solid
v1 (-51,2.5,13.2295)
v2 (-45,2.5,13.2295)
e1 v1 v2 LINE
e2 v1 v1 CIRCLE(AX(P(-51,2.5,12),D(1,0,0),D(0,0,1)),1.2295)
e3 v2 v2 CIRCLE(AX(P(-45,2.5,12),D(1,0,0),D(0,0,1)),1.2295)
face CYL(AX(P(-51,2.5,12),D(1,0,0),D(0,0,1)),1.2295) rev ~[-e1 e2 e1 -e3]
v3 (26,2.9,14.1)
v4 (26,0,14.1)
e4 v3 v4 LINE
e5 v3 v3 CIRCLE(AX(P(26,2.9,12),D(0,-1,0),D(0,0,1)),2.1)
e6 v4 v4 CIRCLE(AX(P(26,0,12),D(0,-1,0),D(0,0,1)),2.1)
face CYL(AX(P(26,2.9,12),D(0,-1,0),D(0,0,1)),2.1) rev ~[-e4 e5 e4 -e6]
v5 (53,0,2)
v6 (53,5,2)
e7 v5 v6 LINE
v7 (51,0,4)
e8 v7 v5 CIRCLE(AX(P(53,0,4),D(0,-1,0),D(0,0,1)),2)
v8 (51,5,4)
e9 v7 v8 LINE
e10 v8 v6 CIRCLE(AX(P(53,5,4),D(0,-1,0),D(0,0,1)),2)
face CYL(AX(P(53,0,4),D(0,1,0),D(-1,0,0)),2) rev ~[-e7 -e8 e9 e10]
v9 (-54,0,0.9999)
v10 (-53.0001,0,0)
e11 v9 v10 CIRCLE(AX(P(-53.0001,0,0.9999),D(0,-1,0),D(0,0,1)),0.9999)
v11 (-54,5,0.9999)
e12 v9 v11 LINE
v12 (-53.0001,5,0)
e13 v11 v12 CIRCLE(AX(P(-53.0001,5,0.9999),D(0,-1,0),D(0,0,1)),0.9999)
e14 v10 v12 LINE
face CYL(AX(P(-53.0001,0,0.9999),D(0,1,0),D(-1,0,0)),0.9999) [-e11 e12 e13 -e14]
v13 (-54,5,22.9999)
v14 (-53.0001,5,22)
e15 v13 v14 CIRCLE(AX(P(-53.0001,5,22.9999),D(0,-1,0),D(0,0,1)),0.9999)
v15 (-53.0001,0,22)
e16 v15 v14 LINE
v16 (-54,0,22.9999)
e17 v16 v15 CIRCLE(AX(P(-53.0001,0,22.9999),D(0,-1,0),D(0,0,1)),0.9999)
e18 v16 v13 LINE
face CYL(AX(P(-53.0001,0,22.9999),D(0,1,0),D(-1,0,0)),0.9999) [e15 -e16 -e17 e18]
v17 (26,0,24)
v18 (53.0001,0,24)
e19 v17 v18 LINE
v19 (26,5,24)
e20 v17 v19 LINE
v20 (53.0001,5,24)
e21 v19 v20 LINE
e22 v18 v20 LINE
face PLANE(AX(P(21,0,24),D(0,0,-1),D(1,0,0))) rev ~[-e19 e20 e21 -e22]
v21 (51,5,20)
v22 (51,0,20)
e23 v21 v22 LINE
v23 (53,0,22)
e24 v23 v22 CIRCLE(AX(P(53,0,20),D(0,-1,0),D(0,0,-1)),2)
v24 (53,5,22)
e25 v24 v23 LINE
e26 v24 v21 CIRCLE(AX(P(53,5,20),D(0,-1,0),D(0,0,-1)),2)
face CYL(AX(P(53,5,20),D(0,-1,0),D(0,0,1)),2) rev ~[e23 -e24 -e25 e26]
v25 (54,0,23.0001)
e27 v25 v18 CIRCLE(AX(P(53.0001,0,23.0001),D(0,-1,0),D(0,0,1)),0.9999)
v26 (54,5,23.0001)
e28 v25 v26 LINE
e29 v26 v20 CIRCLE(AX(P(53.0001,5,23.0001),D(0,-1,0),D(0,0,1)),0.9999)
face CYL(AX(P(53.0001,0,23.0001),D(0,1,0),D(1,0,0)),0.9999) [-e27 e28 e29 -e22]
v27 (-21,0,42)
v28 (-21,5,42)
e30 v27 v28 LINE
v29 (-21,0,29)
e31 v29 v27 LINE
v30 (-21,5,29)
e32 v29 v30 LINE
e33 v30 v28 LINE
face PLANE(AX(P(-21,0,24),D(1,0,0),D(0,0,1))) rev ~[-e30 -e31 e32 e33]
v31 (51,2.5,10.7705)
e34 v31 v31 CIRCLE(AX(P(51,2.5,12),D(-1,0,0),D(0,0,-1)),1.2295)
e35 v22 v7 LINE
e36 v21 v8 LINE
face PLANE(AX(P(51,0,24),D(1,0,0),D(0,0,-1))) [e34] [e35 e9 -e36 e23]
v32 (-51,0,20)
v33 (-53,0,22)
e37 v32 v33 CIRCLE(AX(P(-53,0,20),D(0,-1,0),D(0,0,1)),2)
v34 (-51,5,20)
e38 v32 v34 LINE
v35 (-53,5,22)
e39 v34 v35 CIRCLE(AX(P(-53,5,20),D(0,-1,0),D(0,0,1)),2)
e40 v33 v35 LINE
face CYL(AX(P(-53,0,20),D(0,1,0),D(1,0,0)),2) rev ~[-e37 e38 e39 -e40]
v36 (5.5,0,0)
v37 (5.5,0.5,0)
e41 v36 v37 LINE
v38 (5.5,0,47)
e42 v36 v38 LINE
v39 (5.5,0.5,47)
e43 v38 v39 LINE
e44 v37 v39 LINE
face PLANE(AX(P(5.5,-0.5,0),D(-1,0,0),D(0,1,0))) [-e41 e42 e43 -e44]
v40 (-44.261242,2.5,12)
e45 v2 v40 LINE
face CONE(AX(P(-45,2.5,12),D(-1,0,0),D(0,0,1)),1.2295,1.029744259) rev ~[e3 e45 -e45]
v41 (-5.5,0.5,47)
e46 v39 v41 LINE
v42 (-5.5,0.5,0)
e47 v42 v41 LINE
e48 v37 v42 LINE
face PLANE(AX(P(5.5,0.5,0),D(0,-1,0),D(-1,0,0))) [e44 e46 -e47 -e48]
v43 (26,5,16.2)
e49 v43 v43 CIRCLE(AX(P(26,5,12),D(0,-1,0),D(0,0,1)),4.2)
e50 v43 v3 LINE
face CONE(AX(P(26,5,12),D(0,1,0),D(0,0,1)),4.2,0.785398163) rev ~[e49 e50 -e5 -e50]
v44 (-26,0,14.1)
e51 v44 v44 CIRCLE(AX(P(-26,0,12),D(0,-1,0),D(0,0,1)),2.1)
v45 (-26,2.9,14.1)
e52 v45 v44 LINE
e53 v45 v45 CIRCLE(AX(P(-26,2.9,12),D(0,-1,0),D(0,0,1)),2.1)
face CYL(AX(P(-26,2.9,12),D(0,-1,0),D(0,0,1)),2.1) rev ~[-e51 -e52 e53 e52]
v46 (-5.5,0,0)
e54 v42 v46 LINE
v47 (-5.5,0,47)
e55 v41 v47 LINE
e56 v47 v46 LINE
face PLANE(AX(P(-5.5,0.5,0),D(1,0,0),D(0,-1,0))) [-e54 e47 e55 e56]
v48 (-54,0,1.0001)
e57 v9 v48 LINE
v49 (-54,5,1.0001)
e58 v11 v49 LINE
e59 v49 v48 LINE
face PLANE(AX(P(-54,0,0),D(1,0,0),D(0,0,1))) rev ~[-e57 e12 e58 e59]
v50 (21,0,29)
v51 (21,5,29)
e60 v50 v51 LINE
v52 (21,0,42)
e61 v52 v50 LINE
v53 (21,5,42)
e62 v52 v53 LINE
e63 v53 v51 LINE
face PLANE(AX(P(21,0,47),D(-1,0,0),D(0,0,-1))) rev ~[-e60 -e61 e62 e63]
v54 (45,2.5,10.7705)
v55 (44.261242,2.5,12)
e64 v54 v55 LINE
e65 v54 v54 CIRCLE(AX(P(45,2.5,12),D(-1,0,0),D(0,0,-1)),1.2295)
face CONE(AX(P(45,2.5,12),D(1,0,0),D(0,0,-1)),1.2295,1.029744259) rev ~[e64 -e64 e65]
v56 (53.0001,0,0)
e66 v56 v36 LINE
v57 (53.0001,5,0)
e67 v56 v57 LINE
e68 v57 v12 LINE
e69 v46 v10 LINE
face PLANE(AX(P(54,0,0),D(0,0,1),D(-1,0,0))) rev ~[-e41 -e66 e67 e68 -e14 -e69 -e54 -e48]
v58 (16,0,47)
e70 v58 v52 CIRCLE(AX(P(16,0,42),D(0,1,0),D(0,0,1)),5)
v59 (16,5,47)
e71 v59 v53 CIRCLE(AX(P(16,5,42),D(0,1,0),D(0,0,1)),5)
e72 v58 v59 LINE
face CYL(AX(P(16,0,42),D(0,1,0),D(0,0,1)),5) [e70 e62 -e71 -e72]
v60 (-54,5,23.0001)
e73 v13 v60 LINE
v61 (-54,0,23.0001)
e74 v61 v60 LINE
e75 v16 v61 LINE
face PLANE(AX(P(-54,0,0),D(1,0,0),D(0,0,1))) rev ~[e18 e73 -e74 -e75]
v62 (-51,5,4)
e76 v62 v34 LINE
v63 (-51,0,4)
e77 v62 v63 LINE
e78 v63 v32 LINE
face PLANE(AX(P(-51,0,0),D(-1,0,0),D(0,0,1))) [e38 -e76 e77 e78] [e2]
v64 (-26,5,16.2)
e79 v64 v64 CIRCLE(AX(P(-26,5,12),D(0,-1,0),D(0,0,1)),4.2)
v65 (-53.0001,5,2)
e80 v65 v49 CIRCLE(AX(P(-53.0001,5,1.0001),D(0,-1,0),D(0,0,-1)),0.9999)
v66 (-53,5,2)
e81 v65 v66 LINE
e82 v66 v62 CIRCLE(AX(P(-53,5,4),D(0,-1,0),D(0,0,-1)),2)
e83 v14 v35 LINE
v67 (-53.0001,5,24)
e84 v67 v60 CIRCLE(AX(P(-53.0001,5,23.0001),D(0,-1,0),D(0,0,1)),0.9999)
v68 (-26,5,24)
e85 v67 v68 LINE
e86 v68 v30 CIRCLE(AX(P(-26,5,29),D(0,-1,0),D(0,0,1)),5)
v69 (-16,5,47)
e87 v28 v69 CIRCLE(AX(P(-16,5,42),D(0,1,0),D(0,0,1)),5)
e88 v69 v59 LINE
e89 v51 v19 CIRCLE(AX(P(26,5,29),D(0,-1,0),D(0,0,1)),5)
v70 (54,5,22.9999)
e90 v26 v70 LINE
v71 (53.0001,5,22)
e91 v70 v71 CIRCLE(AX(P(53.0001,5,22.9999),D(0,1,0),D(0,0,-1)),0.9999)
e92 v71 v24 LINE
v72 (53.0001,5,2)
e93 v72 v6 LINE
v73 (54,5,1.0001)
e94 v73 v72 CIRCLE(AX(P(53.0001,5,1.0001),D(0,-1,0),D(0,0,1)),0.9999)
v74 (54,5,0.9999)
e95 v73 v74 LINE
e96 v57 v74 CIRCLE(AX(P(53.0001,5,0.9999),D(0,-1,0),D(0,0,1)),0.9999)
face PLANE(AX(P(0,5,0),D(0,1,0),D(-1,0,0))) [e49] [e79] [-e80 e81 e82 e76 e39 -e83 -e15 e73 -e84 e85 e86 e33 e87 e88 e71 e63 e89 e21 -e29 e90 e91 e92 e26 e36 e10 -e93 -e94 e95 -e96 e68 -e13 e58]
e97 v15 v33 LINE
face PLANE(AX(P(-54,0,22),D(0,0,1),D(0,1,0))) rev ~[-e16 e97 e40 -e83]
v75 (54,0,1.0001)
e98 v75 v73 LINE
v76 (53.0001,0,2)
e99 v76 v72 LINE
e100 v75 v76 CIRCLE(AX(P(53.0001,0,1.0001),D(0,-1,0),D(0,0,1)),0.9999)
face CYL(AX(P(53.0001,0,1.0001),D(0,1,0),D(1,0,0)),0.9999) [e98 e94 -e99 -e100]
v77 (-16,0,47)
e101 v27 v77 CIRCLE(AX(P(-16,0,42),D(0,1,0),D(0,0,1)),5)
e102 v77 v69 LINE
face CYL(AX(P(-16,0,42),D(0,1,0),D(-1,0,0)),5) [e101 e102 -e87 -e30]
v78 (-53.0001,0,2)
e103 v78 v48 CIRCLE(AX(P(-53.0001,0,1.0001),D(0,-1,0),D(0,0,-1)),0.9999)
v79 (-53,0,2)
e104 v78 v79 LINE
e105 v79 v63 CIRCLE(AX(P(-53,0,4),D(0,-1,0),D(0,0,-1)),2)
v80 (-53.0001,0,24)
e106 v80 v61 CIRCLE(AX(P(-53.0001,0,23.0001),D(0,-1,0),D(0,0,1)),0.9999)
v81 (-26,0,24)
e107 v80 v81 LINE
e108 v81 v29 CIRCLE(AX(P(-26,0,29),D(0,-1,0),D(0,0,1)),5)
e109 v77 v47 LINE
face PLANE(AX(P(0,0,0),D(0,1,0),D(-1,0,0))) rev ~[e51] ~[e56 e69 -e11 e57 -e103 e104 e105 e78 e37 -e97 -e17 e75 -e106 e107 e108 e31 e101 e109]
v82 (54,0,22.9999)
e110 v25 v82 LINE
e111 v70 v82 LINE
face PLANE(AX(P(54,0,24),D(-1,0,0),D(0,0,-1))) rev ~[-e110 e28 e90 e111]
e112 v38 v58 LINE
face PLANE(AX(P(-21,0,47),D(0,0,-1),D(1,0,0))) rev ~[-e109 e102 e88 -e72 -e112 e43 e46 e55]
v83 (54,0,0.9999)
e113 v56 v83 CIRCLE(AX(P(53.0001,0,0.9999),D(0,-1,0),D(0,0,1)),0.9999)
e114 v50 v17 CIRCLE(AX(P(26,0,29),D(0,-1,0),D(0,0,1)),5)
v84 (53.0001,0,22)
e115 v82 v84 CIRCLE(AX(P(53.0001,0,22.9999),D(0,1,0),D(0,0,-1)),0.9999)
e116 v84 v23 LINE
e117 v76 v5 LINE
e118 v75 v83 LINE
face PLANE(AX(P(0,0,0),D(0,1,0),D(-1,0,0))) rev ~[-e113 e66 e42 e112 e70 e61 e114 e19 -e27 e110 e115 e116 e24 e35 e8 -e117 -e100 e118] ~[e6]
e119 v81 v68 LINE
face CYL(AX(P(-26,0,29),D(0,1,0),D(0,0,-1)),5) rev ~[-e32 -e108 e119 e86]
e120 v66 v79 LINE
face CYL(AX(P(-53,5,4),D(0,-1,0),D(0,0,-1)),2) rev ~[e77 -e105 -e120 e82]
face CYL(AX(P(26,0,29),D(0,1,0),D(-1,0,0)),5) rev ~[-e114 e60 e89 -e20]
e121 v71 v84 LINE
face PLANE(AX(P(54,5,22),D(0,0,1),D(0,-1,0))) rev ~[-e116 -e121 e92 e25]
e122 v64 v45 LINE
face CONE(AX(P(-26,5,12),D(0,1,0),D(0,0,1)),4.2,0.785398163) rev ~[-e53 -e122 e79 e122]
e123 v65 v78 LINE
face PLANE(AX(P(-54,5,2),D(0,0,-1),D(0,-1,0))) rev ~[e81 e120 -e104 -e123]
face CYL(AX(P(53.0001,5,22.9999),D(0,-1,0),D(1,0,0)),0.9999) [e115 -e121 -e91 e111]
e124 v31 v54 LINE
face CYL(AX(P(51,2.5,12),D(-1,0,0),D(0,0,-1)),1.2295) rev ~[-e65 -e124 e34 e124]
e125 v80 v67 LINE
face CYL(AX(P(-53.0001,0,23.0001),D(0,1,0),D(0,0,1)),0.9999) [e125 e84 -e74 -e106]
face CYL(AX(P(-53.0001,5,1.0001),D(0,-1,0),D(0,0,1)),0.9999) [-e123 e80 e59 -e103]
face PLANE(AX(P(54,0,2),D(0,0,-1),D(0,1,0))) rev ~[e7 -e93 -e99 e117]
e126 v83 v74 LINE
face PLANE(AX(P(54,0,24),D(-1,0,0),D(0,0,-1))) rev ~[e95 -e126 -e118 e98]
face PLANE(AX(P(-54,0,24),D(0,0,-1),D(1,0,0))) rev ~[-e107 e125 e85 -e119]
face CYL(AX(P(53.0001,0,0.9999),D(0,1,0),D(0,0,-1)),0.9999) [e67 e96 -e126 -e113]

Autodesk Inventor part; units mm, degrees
ref_plane "YZ Plane" through (0, 0, 0) normal (1, 0, 0) x (0, 1, 0)
ref_plane "XZ Plane" through (0, 0, 0) normal (0, 1, 0) x (-1, 0, 0)
sketch "Skizze1" plane through (0, 0, 0) normal (0, 1, 0) x (-1, 0, 0)
  line L0 (-54, 0) -> (54, 0)
  line L1 (54, 0) -> (54, 24)
  line L2 (54, 24) -> (21, 24)
  line L3 (21, 24) -> (21, 47)
  line L4 (21, 47) -> (-21, 47)
  line L5 (-21, 47) -> (-21, 24)
  line L6 (-21, 24) -> (-54, 24)
  line L7 (-54, 24) -> (-54, 0)
  point P0 (0, 0)
  point P1 (0, 0)
  dimension "d0" = 108
  dimension "d1" = 24
  dimension "d2" = 33
  dimension "d3" = 23
  dimension "d4" = 42
extrude "Extrusion1" add sketch "Skizze1" along normal blind 5
sketch "Skizze2" plane through (54, 0, 24) normal (1, 0, 0) x (0, 0, -1)
  line L0 (0, 0) -> (24, 0) projected
  line L1 (24, 0) -> (24, 5) projected
  line L2 (0, 5) -> (24, 5) projected
  line L3 (0, 0) -> (0, 5) projected
  line L4 (2, 0) -> (22, 0)
  line L5 (22, 0) -> (22, 5)
  line L6 (22, 5) -> (2, 5)
  line L7 (2, 5) -> (2, 0)
  dimension "d7" = 2
  dimension "d8" = 2
extrude "Extrusion2" cut sketch "Skizze2" against normal blind 3 contours L7 L2 L5 L0
sketch "Skizze3" plane through (-54, 0, 0) normal (-1, 0, 0) x (0, 0, 1)
  line L0 (0, 0) -> (24, 0) projected
  line L1 (24, 0) -> (24, 5) projected
  line L2 (0, 5) -> (24, 5) projected
  line L3 (0, 0) -> (0, 5) projected
  line L4 (2, 0) -> (22, 0)
  line L5 (22, 0) -> (22, 5)
  line L6 (22, 5) -> (2, 5)
  line L7 (2, 5) -> (2, 0)
  dimension "d11" = 2
  dimension "d12" = 2
extrude "Extrusion3" cut sketch "Skizze3" against normal blind 3 contours L7 L2 L5 L0
fillet "Rundung1" radius 1 8 edges at (-54, 2.5, 0) (-54, 2.5, 2) (-54, 2.5, 22) (-54, 2.5, 24) (54, 2.5, 24) (54, 2.5, 22) (54, 2.5, 2) (54, 2.5, 0)
fillet "Rundung2" radius 5 4 edges at (21, 2.5, 24) (21, 2.5, 47) (-21, 2.5, 47) (-21, 2.5, 24)
sketch "Skizze4" plane through (53, 0, 0) normal (0, 0, -1) x (-1, 0, 0)
  line L0 (58.5, -0.5) -> (47.5, -0.5)
  line L1 (47.5, -0.5) -> (47.5, 0.5)
  line L2 (47.5, 0.5) -> (58.5, 0.5)
  line L3 (58.5, 0.5) -> (58.5, -0.5)
  line L4 (58.5, -0.5) -> (47.5, 0.5) construction
  line L5 (47.5, -0.5) -> (58.5, 0.5) construction
  point P0 (53, 0)
  dimension "d17" = 11
  dimension "d18" = 1
extrude "Extrusion4" cut sketch "Skizze4" against normal through all
sketch "Skizze6" plane through (0, 5, 0) normal (0, 1, 0) x (1, 0, 0)
  line L0 (53, 0) -> (-53, 0) projected
  point P0 (0, 0)
  point P1 (-26, -12)
  point P2 (26, -12)
  dimension "d31" = 12
  dimension "d32" = 26
  dimension "d33" = 26
hole "Bohrung2" at (-26, 5, 12) at (26, 5, 12) direction (0, -1, 0) diameter 4.2 end through all countersink diameter 8.4 countersink angle 90
sketch "Skizze7" plane through (51, 0, 24) normal (1, 0, 0) x (0, 0, -1)
  line L0 (22, 5) -> (22, 0) projected
  line L1 (2, 5) -> (22, 5) projected
  point P0 (24, 0)
  point P1 (12, 2.5)
  dimension "d41" = 2.5
  dimension "d42" = 10
hole "Bohrung3" at (51, 2.5, 12) direction (-1, 0, 0) diameter 2.459 depth 6 tip angle 118 thread size "M3x0.5" class "6H" standard "ANSI Metric M Profile"
sketch "Skizze8" plane through (-51, 0, 0) normal (-1, 0, 0) x (0, 0, 1)
  line L0 (2, 5) -> (22, 5) projected
  line L1 (2, 0) -> (2, 5) projected
  point P0 (0, 0)
  point P1 (12, 2.5)
  dimension "d50" = 2.5
  dimension "d51" = 10
hole "Bohrung4" at (-51, 2.5, 12) direction (1, 0, 0) diameter 2.459 depth 6 tip angle 118 thread size "M3x0.5" class "6H" standard "ANSI Metric M Profile"
ref_plane "Arbeitsebene1" through (-51, 0, 12) normal (0, 0, -1) x (-1, 0, 0)
fillet "Rundung3" radius 2 2 edges at (51, 2.5, 2) (51, 2.5, 22)
fillet "Rundung4" radius 2 2 edges at (-51, 2.5, 22) (-51, 2.5, 2)
properties part number "Grundplatte"
